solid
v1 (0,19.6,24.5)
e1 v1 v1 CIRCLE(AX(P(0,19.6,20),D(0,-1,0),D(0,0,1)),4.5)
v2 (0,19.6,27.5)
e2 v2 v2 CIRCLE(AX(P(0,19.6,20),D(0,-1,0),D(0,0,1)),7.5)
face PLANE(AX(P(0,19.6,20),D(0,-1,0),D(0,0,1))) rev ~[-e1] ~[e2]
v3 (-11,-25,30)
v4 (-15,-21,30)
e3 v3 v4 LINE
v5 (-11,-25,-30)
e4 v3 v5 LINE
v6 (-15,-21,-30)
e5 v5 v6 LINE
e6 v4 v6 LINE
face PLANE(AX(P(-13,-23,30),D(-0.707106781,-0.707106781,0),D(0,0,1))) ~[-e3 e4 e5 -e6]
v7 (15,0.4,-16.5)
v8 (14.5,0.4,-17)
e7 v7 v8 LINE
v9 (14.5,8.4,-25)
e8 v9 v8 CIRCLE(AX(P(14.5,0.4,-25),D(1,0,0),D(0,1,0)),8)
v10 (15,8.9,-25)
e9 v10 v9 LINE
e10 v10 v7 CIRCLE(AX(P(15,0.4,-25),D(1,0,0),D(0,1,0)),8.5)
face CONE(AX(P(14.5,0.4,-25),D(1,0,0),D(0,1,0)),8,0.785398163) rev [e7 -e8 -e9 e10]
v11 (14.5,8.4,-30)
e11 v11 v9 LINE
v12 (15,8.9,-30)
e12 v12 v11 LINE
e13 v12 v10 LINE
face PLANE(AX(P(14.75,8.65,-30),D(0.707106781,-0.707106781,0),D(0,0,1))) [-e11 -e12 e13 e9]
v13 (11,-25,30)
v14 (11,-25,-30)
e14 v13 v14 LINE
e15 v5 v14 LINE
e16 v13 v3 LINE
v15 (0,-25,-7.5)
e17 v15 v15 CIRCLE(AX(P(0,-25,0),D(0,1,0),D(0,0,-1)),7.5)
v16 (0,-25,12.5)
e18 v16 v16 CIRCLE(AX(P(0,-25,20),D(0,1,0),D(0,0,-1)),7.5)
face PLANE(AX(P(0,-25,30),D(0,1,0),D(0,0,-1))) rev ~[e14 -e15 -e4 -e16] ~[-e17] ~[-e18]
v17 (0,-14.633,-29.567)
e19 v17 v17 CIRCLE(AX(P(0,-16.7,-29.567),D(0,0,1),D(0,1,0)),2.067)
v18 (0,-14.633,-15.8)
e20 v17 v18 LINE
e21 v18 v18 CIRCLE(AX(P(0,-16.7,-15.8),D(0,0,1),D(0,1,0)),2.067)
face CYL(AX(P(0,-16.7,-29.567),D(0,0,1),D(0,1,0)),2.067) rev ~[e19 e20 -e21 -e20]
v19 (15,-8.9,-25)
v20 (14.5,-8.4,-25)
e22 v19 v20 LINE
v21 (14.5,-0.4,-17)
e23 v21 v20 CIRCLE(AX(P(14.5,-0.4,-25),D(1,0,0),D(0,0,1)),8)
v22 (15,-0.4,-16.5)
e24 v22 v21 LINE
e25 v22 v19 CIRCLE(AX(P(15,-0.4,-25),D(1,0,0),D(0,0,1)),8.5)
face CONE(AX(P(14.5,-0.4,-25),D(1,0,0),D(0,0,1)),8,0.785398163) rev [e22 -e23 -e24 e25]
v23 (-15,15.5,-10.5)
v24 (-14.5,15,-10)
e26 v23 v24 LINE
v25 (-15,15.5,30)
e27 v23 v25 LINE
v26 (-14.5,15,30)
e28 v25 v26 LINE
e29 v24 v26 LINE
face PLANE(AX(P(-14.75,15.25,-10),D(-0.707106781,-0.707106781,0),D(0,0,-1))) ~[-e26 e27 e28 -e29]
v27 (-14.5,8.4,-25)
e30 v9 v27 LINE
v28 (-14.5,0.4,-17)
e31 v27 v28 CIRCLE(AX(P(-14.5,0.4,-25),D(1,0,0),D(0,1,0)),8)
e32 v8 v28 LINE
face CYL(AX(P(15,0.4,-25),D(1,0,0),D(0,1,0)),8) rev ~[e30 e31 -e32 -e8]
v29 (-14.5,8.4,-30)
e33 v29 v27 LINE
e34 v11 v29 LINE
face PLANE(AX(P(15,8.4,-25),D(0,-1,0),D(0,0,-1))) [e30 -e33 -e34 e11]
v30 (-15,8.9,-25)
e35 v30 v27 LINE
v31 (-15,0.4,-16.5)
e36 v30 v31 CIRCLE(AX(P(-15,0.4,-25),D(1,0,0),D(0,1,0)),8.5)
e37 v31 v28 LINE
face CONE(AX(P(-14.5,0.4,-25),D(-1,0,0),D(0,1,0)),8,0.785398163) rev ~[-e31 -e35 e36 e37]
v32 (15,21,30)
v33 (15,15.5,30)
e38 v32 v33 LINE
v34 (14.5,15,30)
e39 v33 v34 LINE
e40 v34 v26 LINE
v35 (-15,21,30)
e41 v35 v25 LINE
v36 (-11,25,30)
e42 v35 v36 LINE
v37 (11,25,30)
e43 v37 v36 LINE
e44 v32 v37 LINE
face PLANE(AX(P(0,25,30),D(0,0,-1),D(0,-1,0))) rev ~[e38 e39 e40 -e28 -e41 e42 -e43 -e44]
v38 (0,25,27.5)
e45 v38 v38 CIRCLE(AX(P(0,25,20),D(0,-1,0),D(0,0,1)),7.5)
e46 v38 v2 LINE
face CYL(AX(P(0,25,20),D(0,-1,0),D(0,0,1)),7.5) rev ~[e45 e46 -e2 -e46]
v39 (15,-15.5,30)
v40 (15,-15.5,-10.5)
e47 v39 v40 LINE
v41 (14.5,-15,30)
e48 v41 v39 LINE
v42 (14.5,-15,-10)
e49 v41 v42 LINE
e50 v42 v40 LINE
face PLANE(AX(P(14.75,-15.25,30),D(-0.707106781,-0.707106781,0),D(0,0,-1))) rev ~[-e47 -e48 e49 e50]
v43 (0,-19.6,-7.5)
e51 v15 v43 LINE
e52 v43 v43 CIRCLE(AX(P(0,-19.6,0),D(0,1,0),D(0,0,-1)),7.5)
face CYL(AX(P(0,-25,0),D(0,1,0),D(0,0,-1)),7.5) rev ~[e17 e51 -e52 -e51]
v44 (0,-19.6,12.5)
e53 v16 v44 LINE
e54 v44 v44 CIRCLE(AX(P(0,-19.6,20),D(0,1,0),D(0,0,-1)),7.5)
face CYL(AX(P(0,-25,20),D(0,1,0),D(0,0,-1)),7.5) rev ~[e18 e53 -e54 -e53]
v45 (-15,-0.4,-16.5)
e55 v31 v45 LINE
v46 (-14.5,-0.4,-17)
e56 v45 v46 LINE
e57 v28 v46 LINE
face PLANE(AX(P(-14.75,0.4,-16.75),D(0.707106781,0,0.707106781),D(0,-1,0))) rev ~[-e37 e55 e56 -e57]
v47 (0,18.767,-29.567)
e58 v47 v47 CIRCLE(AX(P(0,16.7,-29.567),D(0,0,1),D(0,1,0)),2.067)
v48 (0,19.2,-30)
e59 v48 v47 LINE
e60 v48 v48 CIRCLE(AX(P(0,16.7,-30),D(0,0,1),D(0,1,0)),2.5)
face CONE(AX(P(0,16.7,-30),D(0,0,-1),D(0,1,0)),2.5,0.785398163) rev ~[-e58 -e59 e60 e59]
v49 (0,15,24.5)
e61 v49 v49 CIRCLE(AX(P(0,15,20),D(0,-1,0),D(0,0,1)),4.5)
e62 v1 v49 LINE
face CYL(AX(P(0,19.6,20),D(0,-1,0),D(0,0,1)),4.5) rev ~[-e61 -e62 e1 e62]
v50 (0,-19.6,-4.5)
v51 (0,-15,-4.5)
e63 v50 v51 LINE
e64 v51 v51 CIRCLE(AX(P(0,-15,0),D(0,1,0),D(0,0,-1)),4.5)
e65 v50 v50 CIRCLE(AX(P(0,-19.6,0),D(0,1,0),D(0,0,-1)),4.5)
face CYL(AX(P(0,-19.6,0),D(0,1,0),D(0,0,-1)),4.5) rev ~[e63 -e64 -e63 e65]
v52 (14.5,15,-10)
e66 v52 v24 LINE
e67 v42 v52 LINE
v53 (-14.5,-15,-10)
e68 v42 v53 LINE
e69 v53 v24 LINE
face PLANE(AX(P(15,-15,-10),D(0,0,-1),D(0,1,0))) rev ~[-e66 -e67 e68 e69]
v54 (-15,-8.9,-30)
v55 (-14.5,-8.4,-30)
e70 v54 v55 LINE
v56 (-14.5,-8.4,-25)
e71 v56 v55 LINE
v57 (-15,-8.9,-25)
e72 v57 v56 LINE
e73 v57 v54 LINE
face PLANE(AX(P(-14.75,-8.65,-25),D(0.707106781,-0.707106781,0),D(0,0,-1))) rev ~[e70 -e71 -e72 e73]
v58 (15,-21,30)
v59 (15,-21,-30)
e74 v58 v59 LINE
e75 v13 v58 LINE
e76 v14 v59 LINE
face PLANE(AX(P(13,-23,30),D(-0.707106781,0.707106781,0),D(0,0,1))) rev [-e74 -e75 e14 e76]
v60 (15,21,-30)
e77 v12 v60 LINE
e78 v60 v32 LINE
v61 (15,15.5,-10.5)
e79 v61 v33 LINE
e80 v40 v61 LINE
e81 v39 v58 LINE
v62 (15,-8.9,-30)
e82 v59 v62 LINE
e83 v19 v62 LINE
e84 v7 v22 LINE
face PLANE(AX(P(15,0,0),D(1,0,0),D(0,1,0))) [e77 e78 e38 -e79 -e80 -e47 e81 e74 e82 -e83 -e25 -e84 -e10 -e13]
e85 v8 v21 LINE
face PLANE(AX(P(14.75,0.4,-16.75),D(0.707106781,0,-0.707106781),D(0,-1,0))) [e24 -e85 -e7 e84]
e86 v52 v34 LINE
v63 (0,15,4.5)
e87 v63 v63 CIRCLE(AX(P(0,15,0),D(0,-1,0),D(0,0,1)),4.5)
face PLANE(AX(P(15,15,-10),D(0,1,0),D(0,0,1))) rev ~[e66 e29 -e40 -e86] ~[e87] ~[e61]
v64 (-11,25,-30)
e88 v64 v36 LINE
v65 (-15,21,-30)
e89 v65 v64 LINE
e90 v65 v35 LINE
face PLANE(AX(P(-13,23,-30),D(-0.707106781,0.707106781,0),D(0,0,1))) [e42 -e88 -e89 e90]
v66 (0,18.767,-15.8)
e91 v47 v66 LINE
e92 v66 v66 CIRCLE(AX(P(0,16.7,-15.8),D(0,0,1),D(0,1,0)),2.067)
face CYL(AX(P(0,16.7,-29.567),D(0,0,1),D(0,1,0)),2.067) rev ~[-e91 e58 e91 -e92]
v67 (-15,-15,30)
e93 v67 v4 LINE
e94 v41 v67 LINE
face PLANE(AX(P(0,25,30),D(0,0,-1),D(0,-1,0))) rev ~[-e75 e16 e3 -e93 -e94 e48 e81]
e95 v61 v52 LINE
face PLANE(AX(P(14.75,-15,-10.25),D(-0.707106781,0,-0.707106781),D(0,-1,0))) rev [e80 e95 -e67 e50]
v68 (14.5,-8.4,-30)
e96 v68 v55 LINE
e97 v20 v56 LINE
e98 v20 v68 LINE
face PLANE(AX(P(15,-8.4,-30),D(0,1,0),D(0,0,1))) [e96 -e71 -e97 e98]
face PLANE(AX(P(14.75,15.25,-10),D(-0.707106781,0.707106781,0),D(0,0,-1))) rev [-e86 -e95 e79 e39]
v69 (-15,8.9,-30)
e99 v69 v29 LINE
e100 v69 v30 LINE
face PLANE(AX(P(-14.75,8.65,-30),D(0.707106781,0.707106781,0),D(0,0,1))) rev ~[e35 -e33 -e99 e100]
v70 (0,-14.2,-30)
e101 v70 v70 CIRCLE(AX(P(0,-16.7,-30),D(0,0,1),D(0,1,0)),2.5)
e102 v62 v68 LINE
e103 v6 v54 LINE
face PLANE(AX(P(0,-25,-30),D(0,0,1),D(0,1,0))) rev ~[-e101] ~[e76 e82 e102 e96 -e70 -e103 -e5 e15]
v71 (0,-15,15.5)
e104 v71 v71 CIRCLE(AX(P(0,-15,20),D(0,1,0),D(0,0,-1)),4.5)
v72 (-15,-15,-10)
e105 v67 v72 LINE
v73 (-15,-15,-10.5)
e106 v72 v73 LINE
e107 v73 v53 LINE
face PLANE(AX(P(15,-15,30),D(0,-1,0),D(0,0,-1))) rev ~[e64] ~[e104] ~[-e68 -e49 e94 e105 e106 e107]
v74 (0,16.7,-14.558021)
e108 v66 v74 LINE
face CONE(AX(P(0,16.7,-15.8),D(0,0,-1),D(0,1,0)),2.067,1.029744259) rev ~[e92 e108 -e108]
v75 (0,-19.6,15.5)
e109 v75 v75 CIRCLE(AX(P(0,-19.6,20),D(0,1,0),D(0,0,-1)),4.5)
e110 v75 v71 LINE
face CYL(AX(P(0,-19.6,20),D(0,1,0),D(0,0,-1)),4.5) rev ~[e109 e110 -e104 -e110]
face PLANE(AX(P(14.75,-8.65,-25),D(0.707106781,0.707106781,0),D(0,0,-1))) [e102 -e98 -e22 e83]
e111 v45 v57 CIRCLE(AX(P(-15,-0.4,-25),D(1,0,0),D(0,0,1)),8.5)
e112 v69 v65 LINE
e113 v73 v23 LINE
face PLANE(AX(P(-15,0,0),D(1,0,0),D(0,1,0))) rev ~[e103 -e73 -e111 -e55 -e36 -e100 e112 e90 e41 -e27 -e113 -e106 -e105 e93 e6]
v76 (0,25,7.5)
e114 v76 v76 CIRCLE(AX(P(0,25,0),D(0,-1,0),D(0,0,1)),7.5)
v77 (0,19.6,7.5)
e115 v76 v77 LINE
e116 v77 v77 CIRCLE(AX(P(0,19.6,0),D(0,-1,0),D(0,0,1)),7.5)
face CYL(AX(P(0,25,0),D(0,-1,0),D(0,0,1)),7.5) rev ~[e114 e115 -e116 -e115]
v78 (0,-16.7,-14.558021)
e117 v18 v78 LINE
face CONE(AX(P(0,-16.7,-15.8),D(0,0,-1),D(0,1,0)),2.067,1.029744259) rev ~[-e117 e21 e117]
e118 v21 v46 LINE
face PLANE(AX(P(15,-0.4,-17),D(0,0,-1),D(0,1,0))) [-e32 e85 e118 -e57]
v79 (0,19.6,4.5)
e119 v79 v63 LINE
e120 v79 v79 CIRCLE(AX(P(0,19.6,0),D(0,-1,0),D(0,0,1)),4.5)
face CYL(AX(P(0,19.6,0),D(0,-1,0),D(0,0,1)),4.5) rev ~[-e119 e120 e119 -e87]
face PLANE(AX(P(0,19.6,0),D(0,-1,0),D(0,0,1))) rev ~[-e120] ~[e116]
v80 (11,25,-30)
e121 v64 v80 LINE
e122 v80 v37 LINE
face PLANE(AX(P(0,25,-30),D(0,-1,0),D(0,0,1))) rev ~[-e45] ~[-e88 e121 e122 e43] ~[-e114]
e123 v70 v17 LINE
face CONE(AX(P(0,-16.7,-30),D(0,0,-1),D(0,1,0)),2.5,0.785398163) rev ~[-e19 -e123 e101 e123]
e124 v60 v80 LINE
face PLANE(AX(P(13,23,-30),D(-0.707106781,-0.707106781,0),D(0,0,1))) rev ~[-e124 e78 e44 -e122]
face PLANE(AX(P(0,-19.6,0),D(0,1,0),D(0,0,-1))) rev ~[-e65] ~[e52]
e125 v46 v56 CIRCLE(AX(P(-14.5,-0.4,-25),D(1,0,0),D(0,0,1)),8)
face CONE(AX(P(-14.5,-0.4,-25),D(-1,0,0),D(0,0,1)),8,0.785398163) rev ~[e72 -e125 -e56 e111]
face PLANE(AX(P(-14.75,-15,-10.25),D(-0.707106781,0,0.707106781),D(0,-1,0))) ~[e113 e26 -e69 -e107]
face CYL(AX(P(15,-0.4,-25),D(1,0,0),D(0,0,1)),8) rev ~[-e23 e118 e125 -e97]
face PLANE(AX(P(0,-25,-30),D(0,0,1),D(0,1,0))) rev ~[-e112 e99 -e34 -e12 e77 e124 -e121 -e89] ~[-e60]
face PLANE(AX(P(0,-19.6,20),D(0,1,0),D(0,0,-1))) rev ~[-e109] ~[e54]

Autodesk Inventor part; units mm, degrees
ref_plane "YZ Plane" through (0, 0, 0) normal (1, 0, 0) x (0, 1, 0)
ref_plane "XZ Plane" through (0, 0, 0) normal (0, 1, 0) x (-1, 0, 0)
ref_plane "XY Plane" through (0, 0, 0) normal (0, 0, 1) x (1, 0, 0)
sketch "Skizze1" plane through (0, 0, 0) normal (1, 0, 0) x (0, 1, 0)
  line L0 (-35, 0) -> (35, 0) construction
  line L1 (0, 42) -> (0, -42) construction
  line L2 (-25, -30) -> (25, -30)
  line L3 (25, -30) -> (25, 30)
  line L4 (25, 30) -> (-25, 30)
  line L5 (-25, 30) -> (-25, -30)
  line L6 (-25, -30) -> (25, 30) construction
  line L7 (25, -30) -> (-25, 30) construction
  point P0 (0, 0)
  dimension "d0" = 50
  dimension "d1" = 60
extrude "Grundkörper" add sketch "Skizze1" along normal mid plane 30
sketch "Skizze2" plane through (15, 0, 0) normal (1, 0, 0) x (0, 0, -1)
  line L0 (-30, 25) -> (-30, -25) construction
  line L1 (0, -35) -> (0, 35) construction
  line L2 (-42, 0) -> (42, 0) construction
  line L3 (-30, -15) -> (10, -15)
  line L4 (10, -15) -> (10, 15)
  line L5 (10, 15) -> (-30, 15)
  line L6 (-30, 15) -> (-30, -15)
  line L7 (30, -25) -> (30, 25) construction
  line L8 (30, -8.4) -> (25, -8.4)
  line L9 (17, -0.4) -> (17, 0.4)
  line L10 (25, 8.4) -> (30, 8.4)
  line L11 (30, -8.4) -> (30, 8.4)
  arc A0 (17, -0.4) -> (25, -8.4) centre (25, -0.4) ccw
  arc A1 (25, 8.4) -> (17, 0.4) centre (25, 0.4) ccw
  point P0 (0, 0)
  dimension "d4" = 40
  dimension "d5" = 30
  dimension "d14" = 13
  dimension "d15" = 16.8
  dimension "d16" = 8
extrude "Ausschnitt" cut sketch "Skizze2" against normal through all
sketch "Skizze4" plane through (-15, -25, -30) normal (0, -1, 0) x (1, 0, 0)
  line L0 (30, 20) -> (0, 20) construction
  line L1 (30, 60) -> (0, 60) construction
  line L2 (15, 72) -> (15, -12) projected
  line L3 (0, 40) -> (30, 40) construction
  line L4 (0, 0) -> (0, 60) construction
  line L5 (30, 60) -> (30, 0) construction
  point P0 (15, 30)
  point P1 (15, 50)
  point P2 (15, 30)
  dimension "d19" = 40
  dimension "d20" = 20
  dimension "d21" = 20
hole "DIN7984_M8_Boh" at (0, -25, 20) at (0, -25, 0) direction (0, 1, 0) diameter 9 end up to surface counterbore diameter 15 counterbore depth 5.4
mirror "Spiegeln_DIN7984_M8_Boh" about plane through (0, 0, 0) normal (0, 1, 0) of "DIN7984_M8_Boh"
sketch "Skizze5" plane through (15, -25, -30) normal (0, 0, -1) x (-1, 0, 0)
  line L0 (0, 0) -> (30, 0) construction
  line L1 (30, 16.6) -> (0, 16.6) construction
  line L2 (30, 50) -> (0, 50) construction
  line L3 (0, 33.4) -> (30, 33.4) construction
  line L4 (15, -10) -> (15, 60) construction
  line L5 (-6, 25) -> (36, 25) construction
  line L6 (15, 16.6) -> (15, 0) construction
  point P0 (15, 25)
  point P1 (15, 8.3)
  point P2 (15, 41.7)
  dimension "d29" = 33.4
hole "M5x10" at (0, -16.7, -30) at (0, 16.7, -30) direction (0, 0, 1) diameter 4.134 depth 14.2 tip angle 118 countersink diameter 5 countersink angle 90 thread size "M5x0.8" class "6H" standard "ISO Metric profile"
sketch "Skizze" plane through (15, -25, -30) normal (0, 0, -1) x (-1, 0, 0)
  circle A0 centre (15, 8.3) radius 2.5 projected
  line L0 (30, 16.6) -> (0, 16.6) projected
  line L1 (0, 0) -> (0, 16.6) projected
  line L2 (0, 0) -> (30, 0) projected
  line L3 (30, 16.6) -> (30, 0) projected
  circle A1 centre (15, 41.7) radius 2.5 projected
  line L4 (0, 33.4) -> (30, 33.4) projected
  line L5 (30, 50) -> (30, 33.4) projected
  line L6 (30, 50) -> (0, 50) projected
  line L7 (0, 33.4) -> (0, 50) projected
  line L8 (0, 16.6) -> (0, 24.6) projected
  line L9 (0, 24.6) -> (0, 25.4) projected
  line L10 (0, 25.4) -> (0, 33.4) projected
  line L11 (30, 33.4) -> (30, 25.4) projected
  line L12 (30, 25.4) -> (30, 24.6) projected
  line L13 (30, 24.6) -> (30, 16.6) projected
  point P0 (15, 25)
chamfer "Fase_Allgemein" distance 4 angle 45 4 edges at (15, -25, 0) (-15, -25, 0) (15, 25, 0) (-15, 25, 0)
chamfer "Fase" distance 0.5 angle 45 15 edges at (15, -6.0569, -19.3431) (15, 0, -17) (15, 6.0569, -19.3431) (15, 8.4, -27.5) (15, -8.4, -27.5) (-15, 6.0569, -19.3431) (-15, 0, -17) (-15, -6.0569, -19.3431) (-15, -8.4, -27.5) (-15, 8.4, -27.5) (-15, 0, -10) (-15, 15, 10) (15, -15, 10) (15, 0, -10) (15, 15, 10)
equation "\"d20\" = 0.5 * d19"
equation "\"d21\" = 0.5 * d19"
properties part number "200-50-WHEEL-CONNECTOR-30MM-01" material "Aluminium 6061"
